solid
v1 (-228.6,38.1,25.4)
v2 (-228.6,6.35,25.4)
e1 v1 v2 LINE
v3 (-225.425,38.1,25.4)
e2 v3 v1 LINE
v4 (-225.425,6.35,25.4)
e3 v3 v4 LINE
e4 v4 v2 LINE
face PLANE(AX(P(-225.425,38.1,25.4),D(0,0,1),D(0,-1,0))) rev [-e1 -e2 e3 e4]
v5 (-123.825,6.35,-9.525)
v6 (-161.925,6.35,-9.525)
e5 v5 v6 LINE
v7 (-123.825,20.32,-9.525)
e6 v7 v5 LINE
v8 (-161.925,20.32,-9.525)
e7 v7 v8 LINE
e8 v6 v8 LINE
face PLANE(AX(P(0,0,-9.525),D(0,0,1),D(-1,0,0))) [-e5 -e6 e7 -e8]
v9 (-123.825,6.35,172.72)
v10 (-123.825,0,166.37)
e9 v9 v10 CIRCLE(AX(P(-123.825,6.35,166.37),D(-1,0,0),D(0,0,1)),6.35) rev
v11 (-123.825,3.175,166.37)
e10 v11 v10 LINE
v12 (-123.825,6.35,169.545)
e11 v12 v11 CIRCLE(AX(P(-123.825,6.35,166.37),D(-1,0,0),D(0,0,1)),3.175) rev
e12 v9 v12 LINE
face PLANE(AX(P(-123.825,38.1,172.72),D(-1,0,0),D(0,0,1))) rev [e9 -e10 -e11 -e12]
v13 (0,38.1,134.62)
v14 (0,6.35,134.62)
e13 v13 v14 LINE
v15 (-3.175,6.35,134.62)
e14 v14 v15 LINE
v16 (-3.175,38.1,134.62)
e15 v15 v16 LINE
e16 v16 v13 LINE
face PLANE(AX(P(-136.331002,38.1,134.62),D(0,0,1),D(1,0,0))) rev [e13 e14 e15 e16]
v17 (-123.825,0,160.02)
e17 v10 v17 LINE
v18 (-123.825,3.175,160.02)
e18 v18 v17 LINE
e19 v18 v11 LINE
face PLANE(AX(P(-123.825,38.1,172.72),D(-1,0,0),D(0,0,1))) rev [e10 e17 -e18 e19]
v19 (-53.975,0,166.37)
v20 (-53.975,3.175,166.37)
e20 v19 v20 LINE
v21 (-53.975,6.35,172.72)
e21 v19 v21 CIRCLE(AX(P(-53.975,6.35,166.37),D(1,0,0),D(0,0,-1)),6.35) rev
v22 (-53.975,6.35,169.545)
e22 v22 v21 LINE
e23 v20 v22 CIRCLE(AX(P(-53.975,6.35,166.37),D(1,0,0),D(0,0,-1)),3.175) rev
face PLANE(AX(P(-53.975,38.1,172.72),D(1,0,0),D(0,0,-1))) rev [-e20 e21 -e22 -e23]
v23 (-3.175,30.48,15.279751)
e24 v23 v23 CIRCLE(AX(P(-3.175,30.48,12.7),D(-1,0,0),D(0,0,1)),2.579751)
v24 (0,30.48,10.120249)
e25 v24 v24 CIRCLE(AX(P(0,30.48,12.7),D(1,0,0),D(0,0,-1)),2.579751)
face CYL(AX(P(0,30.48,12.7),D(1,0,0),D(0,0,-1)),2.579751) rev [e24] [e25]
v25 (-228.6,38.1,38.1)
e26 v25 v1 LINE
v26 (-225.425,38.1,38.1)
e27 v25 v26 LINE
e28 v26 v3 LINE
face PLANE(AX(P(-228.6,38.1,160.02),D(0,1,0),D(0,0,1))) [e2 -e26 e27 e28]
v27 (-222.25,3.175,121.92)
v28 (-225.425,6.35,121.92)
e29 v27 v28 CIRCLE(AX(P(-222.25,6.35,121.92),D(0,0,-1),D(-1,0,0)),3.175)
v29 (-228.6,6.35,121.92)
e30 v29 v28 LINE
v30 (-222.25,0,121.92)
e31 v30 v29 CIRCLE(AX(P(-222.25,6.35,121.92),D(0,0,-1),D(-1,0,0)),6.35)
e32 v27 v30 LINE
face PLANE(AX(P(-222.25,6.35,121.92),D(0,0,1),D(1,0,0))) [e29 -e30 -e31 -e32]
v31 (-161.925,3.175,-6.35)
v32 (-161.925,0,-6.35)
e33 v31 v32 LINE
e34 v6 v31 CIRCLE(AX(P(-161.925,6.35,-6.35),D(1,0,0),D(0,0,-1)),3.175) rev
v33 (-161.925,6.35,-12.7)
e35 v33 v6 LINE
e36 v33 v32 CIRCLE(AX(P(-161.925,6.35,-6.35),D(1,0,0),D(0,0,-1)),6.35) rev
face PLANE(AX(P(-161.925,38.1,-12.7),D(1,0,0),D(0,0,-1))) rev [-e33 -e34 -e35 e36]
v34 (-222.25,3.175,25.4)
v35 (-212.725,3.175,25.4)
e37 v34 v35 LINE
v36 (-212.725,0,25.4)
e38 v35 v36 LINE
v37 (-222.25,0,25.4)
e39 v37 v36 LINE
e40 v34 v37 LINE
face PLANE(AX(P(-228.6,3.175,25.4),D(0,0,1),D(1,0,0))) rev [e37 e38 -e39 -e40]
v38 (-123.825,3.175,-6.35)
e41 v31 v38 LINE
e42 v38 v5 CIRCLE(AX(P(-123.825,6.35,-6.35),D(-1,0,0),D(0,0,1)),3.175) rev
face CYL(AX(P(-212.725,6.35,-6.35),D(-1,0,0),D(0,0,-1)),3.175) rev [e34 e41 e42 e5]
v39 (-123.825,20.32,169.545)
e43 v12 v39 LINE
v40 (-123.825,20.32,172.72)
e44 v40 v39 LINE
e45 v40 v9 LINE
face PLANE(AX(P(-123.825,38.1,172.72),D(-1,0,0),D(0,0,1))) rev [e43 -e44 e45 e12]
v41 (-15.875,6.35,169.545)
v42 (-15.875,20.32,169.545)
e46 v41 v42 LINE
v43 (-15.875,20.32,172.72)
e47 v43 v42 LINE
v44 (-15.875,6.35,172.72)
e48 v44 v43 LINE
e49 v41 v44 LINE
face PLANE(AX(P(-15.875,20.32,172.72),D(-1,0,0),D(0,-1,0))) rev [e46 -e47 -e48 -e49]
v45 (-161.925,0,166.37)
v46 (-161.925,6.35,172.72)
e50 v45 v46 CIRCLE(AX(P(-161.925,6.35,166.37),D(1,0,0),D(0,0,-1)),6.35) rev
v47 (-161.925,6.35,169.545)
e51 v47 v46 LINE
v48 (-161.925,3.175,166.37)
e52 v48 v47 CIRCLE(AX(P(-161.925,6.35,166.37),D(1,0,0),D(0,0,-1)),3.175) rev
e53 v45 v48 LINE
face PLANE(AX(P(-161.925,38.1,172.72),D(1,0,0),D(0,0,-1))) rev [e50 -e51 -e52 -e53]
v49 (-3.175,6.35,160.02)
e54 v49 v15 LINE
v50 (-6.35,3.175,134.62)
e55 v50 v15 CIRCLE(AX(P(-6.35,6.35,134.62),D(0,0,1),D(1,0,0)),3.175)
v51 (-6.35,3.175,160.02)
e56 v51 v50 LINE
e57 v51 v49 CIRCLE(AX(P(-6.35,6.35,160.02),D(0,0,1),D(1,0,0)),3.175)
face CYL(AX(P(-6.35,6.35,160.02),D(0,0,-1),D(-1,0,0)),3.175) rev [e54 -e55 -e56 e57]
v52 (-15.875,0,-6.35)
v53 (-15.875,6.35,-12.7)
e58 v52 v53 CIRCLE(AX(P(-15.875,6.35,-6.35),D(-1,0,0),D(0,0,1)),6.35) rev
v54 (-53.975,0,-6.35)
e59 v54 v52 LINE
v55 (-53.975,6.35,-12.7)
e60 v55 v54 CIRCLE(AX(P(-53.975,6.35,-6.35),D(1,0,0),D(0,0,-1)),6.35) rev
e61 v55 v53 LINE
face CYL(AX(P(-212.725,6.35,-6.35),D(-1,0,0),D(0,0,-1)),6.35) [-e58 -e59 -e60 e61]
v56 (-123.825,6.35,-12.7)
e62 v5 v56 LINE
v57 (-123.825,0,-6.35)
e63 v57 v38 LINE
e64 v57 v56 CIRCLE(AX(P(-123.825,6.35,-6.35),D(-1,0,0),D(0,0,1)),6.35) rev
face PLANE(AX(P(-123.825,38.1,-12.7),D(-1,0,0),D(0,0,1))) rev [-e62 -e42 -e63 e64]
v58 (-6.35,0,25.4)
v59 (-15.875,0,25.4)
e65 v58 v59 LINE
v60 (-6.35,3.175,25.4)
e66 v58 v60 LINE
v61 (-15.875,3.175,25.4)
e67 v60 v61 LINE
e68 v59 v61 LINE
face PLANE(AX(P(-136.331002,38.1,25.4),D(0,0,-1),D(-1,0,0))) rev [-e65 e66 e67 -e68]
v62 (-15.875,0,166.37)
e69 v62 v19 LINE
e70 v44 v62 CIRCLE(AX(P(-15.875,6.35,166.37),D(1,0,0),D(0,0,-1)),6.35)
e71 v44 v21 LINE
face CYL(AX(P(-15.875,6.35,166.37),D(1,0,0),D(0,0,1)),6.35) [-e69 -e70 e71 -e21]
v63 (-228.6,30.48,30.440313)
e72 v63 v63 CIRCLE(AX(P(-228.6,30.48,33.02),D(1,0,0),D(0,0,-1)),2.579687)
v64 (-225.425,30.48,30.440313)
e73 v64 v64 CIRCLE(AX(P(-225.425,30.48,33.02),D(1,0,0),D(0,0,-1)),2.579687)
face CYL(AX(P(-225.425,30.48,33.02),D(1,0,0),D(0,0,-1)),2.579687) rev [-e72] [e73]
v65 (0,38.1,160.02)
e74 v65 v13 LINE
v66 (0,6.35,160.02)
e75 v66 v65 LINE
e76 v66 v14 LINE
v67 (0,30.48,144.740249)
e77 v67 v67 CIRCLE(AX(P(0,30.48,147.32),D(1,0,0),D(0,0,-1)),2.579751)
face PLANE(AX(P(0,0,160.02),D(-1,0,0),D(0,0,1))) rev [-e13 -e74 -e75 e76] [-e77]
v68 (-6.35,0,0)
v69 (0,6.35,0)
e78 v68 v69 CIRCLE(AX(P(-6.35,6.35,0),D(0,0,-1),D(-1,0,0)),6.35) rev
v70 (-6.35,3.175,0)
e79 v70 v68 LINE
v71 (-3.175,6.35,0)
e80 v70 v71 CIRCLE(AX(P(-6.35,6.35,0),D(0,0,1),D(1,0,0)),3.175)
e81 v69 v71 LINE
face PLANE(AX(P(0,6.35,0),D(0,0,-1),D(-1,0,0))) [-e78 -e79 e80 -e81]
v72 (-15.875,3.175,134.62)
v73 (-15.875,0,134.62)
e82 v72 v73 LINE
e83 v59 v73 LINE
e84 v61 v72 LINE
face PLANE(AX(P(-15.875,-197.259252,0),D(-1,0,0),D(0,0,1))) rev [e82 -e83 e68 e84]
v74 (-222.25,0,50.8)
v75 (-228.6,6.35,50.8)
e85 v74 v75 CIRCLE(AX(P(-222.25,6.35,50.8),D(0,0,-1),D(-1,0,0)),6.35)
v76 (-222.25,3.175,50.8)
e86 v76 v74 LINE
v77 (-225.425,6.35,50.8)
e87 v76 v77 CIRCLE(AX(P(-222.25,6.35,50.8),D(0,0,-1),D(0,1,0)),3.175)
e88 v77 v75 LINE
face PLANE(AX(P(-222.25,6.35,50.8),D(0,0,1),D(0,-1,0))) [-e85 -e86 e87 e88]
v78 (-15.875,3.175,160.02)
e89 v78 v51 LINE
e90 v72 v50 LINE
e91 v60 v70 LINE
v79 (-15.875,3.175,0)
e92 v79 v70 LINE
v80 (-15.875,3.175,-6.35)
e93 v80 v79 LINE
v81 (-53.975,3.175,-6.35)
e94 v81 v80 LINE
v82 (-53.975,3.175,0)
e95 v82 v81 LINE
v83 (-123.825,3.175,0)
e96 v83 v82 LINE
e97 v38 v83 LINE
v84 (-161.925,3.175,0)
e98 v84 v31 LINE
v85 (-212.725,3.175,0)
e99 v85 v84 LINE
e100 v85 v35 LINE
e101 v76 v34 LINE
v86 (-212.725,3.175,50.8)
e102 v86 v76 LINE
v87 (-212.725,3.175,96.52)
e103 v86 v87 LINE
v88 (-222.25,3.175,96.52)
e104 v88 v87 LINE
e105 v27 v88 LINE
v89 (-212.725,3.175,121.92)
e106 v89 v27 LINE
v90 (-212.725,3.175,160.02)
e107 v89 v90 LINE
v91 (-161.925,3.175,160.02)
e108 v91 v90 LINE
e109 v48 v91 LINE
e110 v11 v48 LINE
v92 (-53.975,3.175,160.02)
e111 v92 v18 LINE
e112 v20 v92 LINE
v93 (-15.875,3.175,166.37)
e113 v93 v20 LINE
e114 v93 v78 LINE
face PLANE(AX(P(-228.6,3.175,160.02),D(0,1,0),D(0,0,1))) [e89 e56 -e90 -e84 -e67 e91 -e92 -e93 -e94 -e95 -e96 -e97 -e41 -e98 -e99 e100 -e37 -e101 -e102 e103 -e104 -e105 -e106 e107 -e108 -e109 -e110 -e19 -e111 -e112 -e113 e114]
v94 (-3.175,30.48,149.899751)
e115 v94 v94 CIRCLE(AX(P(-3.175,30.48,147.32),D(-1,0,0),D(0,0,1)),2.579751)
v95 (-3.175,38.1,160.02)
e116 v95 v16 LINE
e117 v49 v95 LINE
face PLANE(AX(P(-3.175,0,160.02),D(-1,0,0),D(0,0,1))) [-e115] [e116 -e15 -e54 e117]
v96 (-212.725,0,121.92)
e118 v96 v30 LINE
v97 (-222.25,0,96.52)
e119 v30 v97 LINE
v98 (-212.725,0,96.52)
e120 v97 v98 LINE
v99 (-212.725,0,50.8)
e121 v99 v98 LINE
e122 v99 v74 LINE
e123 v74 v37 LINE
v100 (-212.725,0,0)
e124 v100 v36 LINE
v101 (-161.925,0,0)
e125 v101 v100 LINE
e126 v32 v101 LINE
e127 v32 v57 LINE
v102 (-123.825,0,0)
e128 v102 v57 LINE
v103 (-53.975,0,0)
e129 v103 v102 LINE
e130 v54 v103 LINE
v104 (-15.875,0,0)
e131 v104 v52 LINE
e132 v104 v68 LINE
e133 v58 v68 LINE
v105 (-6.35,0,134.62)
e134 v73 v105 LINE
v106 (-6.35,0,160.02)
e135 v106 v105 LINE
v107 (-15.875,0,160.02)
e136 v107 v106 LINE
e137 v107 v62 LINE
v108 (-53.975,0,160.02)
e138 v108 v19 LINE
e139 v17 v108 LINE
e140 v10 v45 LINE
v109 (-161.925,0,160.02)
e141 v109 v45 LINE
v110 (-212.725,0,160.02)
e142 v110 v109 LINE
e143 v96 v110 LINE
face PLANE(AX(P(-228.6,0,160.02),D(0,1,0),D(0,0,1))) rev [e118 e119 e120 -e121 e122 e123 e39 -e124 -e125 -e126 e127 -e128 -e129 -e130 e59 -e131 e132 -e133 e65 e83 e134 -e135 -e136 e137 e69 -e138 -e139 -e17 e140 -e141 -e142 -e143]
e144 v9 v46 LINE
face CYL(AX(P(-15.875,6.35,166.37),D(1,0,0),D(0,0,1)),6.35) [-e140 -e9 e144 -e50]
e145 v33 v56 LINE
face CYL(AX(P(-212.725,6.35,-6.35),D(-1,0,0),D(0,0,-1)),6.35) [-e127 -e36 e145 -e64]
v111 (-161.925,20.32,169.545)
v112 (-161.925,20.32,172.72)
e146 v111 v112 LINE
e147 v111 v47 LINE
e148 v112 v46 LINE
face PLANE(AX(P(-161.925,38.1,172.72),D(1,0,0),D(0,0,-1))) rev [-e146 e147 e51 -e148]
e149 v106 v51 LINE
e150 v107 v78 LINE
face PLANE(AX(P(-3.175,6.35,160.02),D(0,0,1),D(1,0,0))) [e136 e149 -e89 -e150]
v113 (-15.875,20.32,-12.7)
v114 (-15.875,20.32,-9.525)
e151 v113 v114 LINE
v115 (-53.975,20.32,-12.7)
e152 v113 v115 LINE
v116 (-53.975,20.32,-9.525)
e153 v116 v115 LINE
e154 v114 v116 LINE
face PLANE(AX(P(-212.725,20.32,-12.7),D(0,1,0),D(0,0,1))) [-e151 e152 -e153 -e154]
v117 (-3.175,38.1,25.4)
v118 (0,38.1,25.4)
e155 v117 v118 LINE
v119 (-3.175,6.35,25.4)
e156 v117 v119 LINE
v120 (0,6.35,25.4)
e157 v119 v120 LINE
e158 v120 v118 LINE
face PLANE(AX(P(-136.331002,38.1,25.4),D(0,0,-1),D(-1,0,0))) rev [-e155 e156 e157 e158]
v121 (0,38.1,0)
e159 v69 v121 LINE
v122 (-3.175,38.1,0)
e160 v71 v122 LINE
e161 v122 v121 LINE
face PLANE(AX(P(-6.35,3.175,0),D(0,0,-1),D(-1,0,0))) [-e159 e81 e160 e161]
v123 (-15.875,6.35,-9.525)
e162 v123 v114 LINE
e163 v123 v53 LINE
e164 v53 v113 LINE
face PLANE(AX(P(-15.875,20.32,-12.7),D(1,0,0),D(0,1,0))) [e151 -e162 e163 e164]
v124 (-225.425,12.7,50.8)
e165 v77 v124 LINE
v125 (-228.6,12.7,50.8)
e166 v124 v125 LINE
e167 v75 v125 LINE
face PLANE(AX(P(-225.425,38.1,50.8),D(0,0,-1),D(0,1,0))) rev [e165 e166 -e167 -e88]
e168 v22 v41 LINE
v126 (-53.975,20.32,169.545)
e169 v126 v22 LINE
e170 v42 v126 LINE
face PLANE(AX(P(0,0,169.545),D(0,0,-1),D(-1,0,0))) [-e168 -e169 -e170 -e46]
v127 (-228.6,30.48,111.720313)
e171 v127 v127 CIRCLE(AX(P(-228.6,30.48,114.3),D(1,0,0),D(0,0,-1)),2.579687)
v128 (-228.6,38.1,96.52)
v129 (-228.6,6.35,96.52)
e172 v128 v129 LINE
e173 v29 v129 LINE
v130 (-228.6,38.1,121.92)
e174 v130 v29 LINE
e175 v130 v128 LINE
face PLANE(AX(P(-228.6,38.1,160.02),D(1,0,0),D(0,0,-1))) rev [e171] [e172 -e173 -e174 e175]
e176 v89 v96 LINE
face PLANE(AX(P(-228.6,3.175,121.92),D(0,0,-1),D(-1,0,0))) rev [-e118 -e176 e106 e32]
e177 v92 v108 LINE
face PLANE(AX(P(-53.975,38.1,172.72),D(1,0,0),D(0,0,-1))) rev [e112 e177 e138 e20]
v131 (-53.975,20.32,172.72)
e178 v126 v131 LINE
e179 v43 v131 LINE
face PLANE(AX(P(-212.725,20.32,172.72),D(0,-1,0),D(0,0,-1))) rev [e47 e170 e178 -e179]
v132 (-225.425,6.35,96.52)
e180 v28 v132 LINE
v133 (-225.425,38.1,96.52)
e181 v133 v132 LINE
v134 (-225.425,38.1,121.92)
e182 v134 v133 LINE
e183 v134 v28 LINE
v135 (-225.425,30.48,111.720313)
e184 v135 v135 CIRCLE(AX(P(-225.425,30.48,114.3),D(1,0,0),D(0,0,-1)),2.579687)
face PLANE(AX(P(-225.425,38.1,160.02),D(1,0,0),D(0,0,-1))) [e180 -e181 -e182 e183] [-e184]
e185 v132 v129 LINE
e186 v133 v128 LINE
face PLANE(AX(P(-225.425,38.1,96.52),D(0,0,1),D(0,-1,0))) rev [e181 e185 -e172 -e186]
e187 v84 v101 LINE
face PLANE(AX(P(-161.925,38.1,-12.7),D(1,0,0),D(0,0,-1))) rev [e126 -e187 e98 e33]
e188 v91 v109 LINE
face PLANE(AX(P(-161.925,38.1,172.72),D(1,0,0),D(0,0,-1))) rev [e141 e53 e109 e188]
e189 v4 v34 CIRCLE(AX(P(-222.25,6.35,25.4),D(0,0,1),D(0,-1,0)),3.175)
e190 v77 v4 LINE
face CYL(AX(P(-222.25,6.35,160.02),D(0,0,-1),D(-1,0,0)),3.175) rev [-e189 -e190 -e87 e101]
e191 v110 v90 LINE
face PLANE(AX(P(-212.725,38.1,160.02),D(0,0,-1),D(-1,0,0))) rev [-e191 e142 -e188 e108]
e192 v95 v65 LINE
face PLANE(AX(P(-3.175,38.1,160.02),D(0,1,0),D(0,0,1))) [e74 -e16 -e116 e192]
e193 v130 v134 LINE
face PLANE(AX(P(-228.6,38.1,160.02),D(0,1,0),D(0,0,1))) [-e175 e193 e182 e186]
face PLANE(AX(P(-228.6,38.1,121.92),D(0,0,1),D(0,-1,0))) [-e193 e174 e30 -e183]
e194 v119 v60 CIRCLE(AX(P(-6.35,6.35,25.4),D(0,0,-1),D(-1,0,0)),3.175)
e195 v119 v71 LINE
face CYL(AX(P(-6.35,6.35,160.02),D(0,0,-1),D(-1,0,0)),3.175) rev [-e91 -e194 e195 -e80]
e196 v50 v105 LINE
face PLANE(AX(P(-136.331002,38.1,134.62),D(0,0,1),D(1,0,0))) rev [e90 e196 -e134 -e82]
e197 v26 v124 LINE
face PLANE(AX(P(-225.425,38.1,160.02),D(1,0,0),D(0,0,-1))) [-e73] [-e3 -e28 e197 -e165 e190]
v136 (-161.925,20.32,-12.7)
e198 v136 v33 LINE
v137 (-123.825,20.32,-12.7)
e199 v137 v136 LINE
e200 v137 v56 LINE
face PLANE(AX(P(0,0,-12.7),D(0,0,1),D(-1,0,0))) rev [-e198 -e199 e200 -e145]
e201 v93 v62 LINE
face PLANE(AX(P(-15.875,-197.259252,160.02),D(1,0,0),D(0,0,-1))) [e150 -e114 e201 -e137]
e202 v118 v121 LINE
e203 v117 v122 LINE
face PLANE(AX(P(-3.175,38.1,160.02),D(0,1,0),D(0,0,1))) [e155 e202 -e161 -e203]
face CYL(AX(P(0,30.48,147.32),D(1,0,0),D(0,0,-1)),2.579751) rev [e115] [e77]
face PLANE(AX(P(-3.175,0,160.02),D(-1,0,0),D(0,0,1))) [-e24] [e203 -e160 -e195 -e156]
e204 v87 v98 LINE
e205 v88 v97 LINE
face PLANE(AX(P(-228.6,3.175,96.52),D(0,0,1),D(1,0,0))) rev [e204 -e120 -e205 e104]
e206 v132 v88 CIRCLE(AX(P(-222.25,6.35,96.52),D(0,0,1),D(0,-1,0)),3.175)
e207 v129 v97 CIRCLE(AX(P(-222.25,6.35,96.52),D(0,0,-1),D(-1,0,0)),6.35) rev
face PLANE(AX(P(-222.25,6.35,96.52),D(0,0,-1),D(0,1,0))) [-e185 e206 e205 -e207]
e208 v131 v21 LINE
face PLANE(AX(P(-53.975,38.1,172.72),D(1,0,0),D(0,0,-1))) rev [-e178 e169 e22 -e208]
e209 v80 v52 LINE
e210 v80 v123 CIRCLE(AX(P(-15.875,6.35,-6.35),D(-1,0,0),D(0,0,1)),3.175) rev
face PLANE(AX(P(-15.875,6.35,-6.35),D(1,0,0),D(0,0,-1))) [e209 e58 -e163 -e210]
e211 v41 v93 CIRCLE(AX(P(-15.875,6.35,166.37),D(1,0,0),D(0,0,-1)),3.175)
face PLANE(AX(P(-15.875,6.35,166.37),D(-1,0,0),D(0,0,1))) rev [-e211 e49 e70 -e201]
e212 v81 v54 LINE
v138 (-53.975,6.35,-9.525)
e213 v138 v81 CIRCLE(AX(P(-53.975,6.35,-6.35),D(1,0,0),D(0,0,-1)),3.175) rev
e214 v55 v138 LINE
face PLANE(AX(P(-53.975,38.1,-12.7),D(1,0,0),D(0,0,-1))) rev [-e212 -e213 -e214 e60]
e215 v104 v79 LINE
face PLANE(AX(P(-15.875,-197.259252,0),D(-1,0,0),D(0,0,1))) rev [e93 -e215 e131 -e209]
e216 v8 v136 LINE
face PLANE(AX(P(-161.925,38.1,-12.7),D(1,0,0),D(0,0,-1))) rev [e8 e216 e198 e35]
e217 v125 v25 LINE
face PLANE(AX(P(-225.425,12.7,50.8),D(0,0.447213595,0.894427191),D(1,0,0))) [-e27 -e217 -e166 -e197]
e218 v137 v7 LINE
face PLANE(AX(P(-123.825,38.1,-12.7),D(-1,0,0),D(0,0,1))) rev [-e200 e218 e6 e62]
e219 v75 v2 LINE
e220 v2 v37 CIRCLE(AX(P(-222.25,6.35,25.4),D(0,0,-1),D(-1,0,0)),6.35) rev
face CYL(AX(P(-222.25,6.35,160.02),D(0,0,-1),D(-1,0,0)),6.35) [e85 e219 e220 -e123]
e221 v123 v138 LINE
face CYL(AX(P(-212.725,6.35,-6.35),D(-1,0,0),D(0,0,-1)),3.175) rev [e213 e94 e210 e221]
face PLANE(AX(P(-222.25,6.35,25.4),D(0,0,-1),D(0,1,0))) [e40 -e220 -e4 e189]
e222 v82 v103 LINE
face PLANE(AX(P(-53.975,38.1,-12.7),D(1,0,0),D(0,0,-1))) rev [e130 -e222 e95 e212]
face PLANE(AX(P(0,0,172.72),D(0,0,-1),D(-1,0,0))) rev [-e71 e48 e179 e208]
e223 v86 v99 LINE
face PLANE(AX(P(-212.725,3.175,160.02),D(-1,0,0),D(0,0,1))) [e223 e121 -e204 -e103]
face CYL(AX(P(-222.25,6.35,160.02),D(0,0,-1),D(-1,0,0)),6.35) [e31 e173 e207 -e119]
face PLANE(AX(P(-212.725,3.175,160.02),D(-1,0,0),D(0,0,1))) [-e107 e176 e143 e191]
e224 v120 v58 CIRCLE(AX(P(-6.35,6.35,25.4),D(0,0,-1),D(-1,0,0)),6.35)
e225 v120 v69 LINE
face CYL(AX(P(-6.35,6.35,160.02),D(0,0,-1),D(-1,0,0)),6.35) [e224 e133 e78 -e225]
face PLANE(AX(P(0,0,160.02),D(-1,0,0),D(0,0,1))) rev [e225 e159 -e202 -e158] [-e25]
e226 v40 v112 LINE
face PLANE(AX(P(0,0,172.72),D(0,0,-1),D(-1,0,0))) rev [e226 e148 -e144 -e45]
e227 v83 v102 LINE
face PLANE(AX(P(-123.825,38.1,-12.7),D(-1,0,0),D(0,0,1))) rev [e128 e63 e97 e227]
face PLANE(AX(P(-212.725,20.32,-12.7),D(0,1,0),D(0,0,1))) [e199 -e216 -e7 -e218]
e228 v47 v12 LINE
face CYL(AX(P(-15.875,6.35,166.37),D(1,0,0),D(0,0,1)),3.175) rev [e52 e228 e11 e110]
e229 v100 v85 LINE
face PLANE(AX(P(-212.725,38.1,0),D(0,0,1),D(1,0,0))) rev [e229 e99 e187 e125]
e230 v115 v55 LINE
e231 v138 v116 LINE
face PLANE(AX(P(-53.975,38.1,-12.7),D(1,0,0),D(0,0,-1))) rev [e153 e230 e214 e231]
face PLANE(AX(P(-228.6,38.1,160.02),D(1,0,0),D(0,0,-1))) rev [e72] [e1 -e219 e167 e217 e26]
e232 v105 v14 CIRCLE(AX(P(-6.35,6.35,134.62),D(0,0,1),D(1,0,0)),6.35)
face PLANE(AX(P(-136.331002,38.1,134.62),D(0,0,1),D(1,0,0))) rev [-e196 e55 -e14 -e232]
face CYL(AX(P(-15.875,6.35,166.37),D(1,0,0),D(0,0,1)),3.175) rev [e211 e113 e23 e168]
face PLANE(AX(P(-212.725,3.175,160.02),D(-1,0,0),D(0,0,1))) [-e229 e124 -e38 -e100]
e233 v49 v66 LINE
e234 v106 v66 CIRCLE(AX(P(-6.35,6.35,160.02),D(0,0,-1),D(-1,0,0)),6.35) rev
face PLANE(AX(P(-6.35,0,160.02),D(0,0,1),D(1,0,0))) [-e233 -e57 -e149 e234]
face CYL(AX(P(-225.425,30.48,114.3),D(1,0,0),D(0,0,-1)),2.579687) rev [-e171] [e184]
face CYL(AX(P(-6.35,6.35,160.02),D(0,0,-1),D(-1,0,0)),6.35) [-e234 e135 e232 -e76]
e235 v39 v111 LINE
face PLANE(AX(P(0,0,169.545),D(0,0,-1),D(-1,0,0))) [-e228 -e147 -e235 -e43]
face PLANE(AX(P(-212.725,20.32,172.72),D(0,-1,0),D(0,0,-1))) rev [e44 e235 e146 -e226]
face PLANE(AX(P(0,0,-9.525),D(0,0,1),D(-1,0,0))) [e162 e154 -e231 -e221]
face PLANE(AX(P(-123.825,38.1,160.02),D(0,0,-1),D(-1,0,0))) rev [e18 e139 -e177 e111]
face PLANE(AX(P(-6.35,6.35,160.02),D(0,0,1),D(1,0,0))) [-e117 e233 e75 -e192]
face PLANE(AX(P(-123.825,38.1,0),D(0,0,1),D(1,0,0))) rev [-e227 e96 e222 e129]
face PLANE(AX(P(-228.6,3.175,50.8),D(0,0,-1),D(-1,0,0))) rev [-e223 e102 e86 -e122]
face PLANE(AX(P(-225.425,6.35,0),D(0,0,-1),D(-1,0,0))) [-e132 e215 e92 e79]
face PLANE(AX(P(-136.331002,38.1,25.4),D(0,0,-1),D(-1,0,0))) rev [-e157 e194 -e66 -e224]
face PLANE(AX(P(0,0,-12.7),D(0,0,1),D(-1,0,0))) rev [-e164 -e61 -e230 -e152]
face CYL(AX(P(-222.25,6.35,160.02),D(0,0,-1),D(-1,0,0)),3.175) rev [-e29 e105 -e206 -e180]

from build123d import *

# Parameters (mm, degrees)
BASE_FLANGE1_DEPTH               = 160.02
SKETCH17_W                       = 196.85
SKETCH17_H                       = 12.7
BOSS_EXTRUDE2_DEPTH              = 3.175
EDGE_FLANGE1_STRIP_W             = 19.05
EDGE_FLANGE1_STRIP_H             = 3.175
EDGE_FLANGE1_STRIP_CUT_DEPTH     = 196.85
EDGE_FLANGE1_DEPTH               = 196.85
CUT_EXTRUDE3_REACH               = 291.036
SKETCH24_R                       = 2.5796875
SKETCH24_W                       = 45.72
SKETCH24_H                       = 50.8
SKETCH24_W_2                     = 38.1
SKETCH24_W_3                     = 25.4
F_13_64_0_20313_DIAMETER_HOLE1_D = 5.159502
CUT_EXTRUDE4_REACH               = 291.036
SKETCH28_W                       = 109.22
SKETCH28_H                       = 50.8
SKETCH29_W                       = 69.85
SKETCH29_H                       = 12.7
SKETCH29_W_2                     = 50.8
CUT_EXTRUDE5_DEPTH               = 290.035929254
CHAMFER1_SIZE                    = 12.7
CHAMFER1_SIZE2                   = 25.4


# Sheet-metal steps are written as plain solids
with BuildPart() as part:
    # Sketch7 → Base-Flange1 (new body)
    with BuildSketch(Plane.XY):
        with BuildLine():
            Line((-228.6, 38.1), (-228.6, 6.35))
            ThreePointArc((-228.6, 6.35), (-226.740128061, 1.859871939), (-222.25, 0))
            Line((-222.25, 0), (-6.35, 0))
            ThreePointArc((-6.35, 0), (-1.859871939, 1.859871939), (0, 6.35))
            Line((0, 6.35), (0, 38.1))
            Line((0, 38.1), (-3.175, 38.1))
            Line((-3.175, 38.1), (-3.175, 6.35))
            ThreePointArc((-3.175, 6.35), (-4.10493597, 4.10493597), (-6.35, 3.175))
            Line((-6.35, 3.175), (-222.25, 3.175))
            ThreePointArc((-222.25, 3.175), (-224.49506403, 4.10493597), (-225.425, 6.35))
            Line((-225.425, 6.35), (-225.425, 38.1))
            Line((-225.425, 38.1), (-228.6, 38.1))
        make_face()
    extrude(amount=BASE_FLANGE1_DEPTH)

    # Sketch17 → Boss-Extrude2 (add)
    with BuildSketch(Plane(origin=(0, 3.175, 0), x_dir=(1, 0, 0), z_dir=(0, 1, 0))):
        with Locations((-114.3, -166.37)):
            Rectangle(SKETCH17_W, SKETCH17_H)
    boss_extrude2 = extrude(amount=-BOSS_EXTRUDE2_DEPTH)

    # Edge-Flange1 strip (across the edge) → Edge-Flange1 strip cut (cut)
    with BuildSketch(Plane(origin=(-212.725, 3.175, 172.72), x_dir=(0, 0, -1), z_dir=(1, 0, 0))):
        with Locations((-3.175, -1.5875)):
            Rectangle(EDGE_FLANGE1_STRIP_W, EDGE_FLANGE1_STRIP_H)
    edge_flange1_strip_cut = extrude(amount=EDGE_FLANGE1_STRIP_CUT_DEPTH, mode=Mode.SUBTRACT)

    # Edge-Flange1 section (across the edge) → Edge-Flange1 (add)
    with BuildSketch(Plane(origin=(-212.725, 3.175, 172.72), x_dir=(0, 0, -1), z_dir=(1, 0, 0))):
        with BuildLine():
            Line((0, 3.175), (0, 17.145))
            Line((0, 17.145), (3.175, 17.145))
            Line((3.175, 17.145), (3.175, 3.175))
            ThreePointArc((3.175, 3.175), (4.10493597, 0.92993597), (6.35, 0))
            Line((6.35, 0), (6.35, -3.175))
            ThreePointArc((6.35, -3.175), (1.859871939, -1.315128061), (0, 3.175))
        make_face()
    edge_flange1 = extrude(amount=EDGE_FLANGE1_DEPTH)

    # Mirror1: Boss-Extrude2, Edge-Flange1 strip cut, Edge-Flange1 across plane
    add(boss_extrude2.mirror(Plane.XY.offset(80.01)))
    add(edge_flange1_strip_cut.mirror(Plane.XY.offset(80.01)), mode=Mode.SUBTRACT)
    add(edge_flange1.mirror(Plane.XY.offset(80.01)))

    # Cut-Extrude3: up to this face of the body (flat: up to its plane)
    cut_extrude3_end = Plane(part.part.faces().sort_by_distance((-212.725, 2.935376879, 163.195))[0])
    # Sketch24 → Cut-Extrude3 (cut, up to the picked face)
    with BuildSketch(Plane.ZY.offset(228.6), mode=Mode.PRIVATE) as cut_extrude3_sk1:
        with Locations(Location((33.02, 30.48, 0), (0, 0, 180))):
            Circle(SKETCH24_R)
    cut_extrude3_tool1 = split(extrude(cut_extrude3_sk1.sketch, amount=-CUT_EXTRUDE3_REACH, mode=Mode.PRIVATE), bisect_by=cut_extrude3_end, keep=Keep.BOTH, mode=Mode.PRIVATE)
    # Sketch24 → Cut-Extrude3 (cut, up to the picked face)
    with BuildSketch(Plane.ZY.offset(228.6), mode=Mode.PRIVATE) as cut_extrude3_sk2:
        with Locations(Location((114.3, 30.48, 0), (0, 0, 180))):
            Circle(SKETCH24_R)
    cut_extrude3_tool2 = split(extrude(cut_extrude3_sk2.sketch, amount=-CUT_EXTRUDE3_REACH, mode=Mode.PRIVATE), bisect_by=cut_extrude3_end, keep=Keep.BOTH, mode=Mode.PRIVATE)
    # Sketch24 → Cut-Extrude3 (cut, up to the picked face)
    with BuildSketch(Plane.ZY.offset(228.6), mode=Mode.PRIVATE) as cut_extrude3_sk3:
        with Locations((73.66, 12.7)):
            Rectangle(SKETCH24_W, SKETCH24_H)
    cut_extrude3_tool3 = split(extrude(cut_extrude3_sk3.sketch, amount=-CUT_EXTRUDE3_REACH, mode=Mode.PRIVATE), bisect_by=cut_extrude3_end, keep=Keep.BOTH, mode=Mode.PRIVATE)
    # Sketch24 → Cut-Extrude3 (cut, up to the picked face)
    with BuildSketch(Plane.ZY.offset(228.6), mode=Mode.PRIVATE) as cut_extrude3_sk4:
        with Locations((140.97, 12.7)):
            Rectangle(SKETCH24_W_2, SKETCH24_H)
    cut_extrude3_tool4 = split(extrude(cut_extrude3_sk4.sketch, amount=-CUT_EXTRUDE3_REACH, mode=Mode.PRIVATE), bisect_by=cut_extrude3_end, keep=Keep.BOTH, mode=Mode.PRIVATE)
    # Sketch24 → Cut-Extrude3 (cut, up to the picked face)
    with BuildSketch(Plane.ZY.offset(228.6), mode=Mode.PRIVATE) as cut_extrude3_sk5:
        with Locations((12.7, 12.7)):
            Rectangle(SKETCH24_W_3, SKETCH24_H)
    cut_extrude3_tool5 = split(extrude(cut_extrude3_sk5.sketch, amount=-CUT_EXTRUDE3_REACH, mode=Mode.PRIVATE), bisect_by=cut_extrude3_end, keep=Keep.BOTH, mode=Mode.PRIVATE)
    add(cut_extrude3_tool1.solids().sort_by(Axis((-228.6, 30.48, 33.02), (1, 0, 0)))[0], mode=Mode.SUBTRACT)
    add(cut_extrude3_tool2.solids().sort_by(Axis((-228.6, 30.48, 114.3), (1, 0, 0)))[0], mode=Mode.SUBTRACT)
    add(cut_extrude3_tool3.solids().sort_by(Axis((-228.6, 12.7, 73.66), (1, 0, 0)))[0], mode=Mode.SUBTRACT)
    add(cut_extrude3_tool4.solids().sort_by(Axis((-228.6, 12.7, 140.97), (1, 0, 0)))[0], mode=Mode.SUBTRACT)
    add(cut_extrude3_tool5.solids().sort_by(Axis((-228.6, 12.7, 12.7), (1, 0, 0)))[0], mode=Mode.SUBTRACT)

    # 13/64 (0.20313) Diameter Hole1 (through all)
    with Locations(Plane(origin=(0, 0, 0), x_dir=(0, 0, -1), z_dir=(1, 0, 0))):
        with Locations((-147.32, 30.48), (-12.7, 30.48)):
            Hole(F_13_64_0_20313_DIAMETER_HOLE1_D / 2)

    # Cut-Extrude4: up to this face of the body (flat: up to its plane)
    cut_extrude4_end = Plane(part.part.faces().sort_by_distance((-15.875, 2.935376879, -3.175))[0])
    # Sketch28 → Cut-Extrude4 (cut, up to the picked face)
    with BuildSketch(Plane(origin=(0, 0, 0), x_dir=(0, 0, -1), z_dir=(1, 0, 0)), mode=Mode.PRIVATE) as cut_extrude4_sk1:
        with Locations((-80.01, 12.7)):
            Rectangle(SKETCH28_W, SKETCH28_H)
    cut_extrude4_tool1 = split(extrude(cut_extrude4_sk1.sketch, amount=-CUT_EXTRUDE4_REACH, mode=Mode.PRIVATE), bisect_by=cut_extrude4_end, keep=Keep.BOTH, mode=Mode.PRIVATE)
    add(cut_extrude4_tool1.solids().sort_by(Axis((0, 12.7, 80.01), (-1, 0, 0)))[0], mode=Mode.SUBTRACT)

    # Sketch29 → Cut-Extrude5 (cut, through all)
    with BuildSketch(Plane(origin=(0, 0, 0), x_dir=(-1, 0, 0), z_dir=(0, -1, 0))):
        with Locations((88.9, -166.37)):
            Rectangle(SKETCH29_W, SKETCH29_H)
        with Locations((88.9, 6.35)):
            Rectangle(SKETCH29_W, SKETCH29_H)
        with Locations((187.325, -166.37)):
            Rectangle(SKETCH29_W_2, SKETCH29_H)
        with Locations((187.325, 6.35)):
            Rectangle(SKETCH29_W_2, SKETCH29_H)
    extrude(amount=-CUT_EXTRUDE5_DEPTH, mode=Mode.SUBTRACT)

    # Chamfer1
    chamfer1_edges = [part.edges().sort_by_distance(p)[0] for p in [
        (-227.0125, 38.1, 50.8),
    ]]
    chamfer1_side = [part.faces().sort_by_distance(p)[0] for p in [
        (-227.0125, 38.1, 38.1),
    ]]
    chamfer(chamfer1_edges, length=CHAMFER1_SIZE, length2=CHAMFER1_SIZE2, reference=chamfer1_side[0])


solid = part.part
